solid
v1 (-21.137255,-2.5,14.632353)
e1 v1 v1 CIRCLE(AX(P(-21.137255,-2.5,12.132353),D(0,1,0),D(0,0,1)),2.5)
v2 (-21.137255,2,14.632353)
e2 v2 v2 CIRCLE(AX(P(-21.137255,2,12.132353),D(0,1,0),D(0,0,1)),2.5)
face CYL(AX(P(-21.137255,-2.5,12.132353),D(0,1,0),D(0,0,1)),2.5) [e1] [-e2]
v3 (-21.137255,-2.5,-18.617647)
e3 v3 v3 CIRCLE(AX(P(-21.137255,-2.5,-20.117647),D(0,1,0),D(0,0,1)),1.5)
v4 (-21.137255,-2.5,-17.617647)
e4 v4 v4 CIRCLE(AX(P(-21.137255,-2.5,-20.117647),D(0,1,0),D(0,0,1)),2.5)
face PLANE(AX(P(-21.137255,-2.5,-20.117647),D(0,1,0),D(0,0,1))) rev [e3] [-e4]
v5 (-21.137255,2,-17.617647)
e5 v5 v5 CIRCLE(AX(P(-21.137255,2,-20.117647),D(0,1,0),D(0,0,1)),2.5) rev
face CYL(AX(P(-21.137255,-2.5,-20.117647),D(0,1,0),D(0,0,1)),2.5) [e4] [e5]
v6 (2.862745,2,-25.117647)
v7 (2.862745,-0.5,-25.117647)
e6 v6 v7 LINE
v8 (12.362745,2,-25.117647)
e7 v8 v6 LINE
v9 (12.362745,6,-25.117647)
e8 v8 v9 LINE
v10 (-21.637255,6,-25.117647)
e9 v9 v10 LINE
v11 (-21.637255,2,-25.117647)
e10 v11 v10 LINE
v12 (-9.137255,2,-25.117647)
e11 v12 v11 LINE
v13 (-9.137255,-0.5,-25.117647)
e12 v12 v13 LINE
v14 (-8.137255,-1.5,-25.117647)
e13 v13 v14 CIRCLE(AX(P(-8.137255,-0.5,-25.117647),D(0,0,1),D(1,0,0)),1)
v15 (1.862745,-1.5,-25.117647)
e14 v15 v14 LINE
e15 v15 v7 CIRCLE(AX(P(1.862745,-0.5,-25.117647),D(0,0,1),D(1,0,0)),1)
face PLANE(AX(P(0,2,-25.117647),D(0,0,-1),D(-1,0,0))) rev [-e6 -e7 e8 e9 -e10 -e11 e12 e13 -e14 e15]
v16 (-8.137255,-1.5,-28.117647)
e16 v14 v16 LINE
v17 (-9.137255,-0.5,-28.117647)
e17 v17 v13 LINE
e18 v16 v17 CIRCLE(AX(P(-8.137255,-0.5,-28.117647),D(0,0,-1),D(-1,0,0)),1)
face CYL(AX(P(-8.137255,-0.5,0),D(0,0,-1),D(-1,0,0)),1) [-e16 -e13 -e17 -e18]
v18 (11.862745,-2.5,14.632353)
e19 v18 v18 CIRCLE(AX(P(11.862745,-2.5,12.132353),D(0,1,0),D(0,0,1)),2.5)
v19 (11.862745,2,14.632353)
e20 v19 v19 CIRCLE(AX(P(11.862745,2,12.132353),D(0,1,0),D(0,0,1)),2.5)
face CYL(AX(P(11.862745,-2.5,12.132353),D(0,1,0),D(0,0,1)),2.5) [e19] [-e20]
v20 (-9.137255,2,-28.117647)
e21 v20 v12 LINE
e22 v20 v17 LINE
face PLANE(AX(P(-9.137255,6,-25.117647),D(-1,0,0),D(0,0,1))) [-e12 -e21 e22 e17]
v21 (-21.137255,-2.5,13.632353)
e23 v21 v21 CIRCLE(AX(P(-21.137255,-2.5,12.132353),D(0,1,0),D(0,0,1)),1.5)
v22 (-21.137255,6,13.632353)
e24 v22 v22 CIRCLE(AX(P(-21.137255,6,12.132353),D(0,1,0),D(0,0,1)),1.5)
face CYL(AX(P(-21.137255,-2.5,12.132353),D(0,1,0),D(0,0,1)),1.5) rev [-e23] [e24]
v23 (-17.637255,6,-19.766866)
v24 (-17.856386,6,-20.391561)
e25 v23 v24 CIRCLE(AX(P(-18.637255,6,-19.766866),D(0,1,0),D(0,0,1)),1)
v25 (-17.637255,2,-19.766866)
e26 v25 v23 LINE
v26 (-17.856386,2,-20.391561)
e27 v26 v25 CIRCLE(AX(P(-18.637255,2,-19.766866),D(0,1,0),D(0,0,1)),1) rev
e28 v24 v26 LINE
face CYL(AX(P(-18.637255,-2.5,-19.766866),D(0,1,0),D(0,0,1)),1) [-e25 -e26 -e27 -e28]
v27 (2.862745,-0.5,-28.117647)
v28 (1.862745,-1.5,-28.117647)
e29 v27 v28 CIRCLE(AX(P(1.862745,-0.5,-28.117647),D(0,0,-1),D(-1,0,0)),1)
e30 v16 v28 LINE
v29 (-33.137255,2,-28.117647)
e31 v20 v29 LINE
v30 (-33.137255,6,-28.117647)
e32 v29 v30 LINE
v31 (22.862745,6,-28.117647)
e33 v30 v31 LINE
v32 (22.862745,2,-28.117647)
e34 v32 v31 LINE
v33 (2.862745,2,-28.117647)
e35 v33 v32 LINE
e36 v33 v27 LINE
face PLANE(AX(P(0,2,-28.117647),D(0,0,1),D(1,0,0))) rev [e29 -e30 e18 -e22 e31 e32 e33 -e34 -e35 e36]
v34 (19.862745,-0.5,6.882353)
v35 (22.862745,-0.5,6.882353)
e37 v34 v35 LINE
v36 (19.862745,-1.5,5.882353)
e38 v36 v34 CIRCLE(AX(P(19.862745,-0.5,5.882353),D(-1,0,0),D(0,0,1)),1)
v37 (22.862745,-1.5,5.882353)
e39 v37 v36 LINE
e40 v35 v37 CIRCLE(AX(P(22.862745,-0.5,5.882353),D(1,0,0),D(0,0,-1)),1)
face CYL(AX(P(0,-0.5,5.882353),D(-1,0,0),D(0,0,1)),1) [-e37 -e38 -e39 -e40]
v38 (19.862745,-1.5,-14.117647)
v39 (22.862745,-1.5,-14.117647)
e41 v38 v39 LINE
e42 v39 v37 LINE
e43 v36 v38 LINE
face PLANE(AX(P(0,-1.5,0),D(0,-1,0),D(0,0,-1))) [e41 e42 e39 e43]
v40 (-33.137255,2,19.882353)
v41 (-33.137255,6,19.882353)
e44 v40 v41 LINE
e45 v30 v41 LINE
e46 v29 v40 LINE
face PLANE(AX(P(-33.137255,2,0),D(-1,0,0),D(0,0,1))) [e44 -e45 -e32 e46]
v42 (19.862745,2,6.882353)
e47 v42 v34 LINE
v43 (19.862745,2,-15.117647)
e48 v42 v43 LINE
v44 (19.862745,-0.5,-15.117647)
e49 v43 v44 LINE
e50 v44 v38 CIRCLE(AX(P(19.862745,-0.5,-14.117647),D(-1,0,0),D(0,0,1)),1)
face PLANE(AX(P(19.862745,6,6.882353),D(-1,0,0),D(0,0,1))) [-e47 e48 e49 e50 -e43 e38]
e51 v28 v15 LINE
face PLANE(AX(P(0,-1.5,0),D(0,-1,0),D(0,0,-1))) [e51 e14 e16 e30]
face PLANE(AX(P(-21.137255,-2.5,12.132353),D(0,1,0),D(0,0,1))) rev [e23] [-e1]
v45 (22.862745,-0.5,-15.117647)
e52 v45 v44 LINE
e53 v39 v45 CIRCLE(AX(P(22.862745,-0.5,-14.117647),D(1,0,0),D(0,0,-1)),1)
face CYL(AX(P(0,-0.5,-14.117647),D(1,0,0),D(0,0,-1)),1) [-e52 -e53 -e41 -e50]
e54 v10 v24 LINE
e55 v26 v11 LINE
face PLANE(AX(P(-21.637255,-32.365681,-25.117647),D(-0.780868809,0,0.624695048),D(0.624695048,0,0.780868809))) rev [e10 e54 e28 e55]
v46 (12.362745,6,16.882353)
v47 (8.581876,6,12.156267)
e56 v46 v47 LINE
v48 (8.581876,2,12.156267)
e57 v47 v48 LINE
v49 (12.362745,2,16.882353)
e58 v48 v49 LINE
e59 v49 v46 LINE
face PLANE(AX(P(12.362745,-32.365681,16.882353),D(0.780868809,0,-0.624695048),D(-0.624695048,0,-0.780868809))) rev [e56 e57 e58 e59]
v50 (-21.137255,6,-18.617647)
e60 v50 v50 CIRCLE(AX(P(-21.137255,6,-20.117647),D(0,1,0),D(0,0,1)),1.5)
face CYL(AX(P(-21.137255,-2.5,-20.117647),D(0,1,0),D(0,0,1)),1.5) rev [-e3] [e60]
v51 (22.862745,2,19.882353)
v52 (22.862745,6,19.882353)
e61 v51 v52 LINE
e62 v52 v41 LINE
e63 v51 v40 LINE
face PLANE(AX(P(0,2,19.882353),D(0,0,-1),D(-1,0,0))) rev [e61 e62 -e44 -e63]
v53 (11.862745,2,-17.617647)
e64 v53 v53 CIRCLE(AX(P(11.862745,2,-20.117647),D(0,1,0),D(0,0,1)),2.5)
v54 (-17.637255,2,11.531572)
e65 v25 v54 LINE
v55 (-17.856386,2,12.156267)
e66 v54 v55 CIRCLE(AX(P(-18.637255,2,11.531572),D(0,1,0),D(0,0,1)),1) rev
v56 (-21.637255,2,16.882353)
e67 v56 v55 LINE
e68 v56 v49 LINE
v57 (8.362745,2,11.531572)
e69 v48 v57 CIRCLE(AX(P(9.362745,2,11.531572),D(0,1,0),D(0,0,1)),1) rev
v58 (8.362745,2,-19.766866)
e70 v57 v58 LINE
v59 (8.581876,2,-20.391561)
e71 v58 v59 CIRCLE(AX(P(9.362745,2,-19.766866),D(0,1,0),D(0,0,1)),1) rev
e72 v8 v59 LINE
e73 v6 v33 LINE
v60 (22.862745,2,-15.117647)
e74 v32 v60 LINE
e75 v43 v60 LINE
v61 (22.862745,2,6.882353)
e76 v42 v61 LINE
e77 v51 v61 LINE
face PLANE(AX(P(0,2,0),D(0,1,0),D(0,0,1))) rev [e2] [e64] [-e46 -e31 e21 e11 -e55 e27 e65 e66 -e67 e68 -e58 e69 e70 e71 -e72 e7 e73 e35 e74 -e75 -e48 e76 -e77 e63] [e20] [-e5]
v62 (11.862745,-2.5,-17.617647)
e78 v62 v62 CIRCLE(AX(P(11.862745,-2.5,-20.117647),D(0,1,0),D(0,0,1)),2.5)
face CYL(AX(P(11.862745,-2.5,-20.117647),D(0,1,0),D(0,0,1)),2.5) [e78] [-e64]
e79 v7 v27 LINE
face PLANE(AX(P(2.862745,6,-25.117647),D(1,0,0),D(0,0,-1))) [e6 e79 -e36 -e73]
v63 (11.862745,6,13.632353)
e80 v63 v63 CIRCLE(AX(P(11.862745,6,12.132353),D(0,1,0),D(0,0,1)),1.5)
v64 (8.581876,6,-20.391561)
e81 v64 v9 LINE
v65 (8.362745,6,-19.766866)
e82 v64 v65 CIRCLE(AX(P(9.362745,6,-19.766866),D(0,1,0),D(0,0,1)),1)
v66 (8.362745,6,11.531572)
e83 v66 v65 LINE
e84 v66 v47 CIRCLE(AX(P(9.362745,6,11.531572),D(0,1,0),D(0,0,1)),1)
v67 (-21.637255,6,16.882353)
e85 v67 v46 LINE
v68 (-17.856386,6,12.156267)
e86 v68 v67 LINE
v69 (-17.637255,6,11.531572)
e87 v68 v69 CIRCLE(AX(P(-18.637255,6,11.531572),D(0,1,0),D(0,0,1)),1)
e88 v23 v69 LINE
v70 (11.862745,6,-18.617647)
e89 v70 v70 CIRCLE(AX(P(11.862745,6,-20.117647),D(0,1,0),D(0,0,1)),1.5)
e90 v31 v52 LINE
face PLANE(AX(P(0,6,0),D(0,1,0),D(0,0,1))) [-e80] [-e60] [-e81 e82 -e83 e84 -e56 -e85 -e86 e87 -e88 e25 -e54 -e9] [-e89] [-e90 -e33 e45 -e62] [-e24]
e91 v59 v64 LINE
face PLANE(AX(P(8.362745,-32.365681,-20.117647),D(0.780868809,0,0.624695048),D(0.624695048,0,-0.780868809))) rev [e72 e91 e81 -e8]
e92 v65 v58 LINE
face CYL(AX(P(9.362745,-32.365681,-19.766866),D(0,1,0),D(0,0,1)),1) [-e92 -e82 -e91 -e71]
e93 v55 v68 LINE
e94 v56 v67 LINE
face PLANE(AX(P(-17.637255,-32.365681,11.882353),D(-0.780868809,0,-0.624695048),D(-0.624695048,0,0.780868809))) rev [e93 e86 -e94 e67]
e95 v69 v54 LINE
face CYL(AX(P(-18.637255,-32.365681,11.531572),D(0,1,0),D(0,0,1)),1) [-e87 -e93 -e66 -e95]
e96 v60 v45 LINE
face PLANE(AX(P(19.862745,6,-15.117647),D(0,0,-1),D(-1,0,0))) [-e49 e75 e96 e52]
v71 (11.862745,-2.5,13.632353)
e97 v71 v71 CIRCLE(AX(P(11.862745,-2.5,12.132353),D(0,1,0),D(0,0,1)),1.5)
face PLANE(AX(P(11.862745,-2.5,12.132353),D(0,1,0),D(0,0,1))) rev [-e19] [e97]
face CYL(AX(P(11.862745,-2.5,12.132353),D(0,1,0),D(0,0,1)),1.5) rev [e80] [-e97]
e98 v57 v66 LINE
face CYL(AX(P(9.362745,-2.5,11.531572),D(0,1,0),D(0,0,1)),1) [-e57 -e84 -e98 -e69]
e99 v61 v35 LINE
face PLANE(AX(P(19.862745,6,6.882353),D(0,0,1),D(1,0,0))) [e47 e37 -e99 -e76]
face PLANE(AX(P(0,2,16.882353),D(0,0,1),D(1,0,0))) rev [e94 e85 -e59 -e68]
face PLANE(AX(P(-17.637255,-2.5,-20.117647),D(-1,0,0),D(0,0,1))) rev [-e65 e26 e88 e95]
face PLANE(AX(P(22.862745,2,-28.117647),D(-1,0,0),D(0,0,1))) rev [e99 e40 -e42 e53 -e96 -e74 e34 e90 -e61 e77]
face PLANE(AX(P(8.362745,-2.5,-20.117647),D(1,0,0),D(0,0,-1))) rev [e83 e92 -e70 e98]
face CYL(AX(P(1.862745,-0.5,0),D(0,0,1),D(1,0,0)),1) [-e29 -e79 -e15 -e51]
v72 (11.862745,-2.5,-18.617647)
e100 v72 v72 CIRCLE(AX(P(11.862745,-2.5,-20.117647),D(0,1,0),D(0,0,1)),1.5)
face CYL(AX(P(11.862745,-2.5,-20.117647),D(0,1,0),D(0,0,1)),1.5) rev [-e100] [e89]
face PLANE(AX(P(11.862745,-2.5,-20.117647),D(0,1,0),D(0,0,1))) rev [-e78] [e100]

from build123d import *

# Parameters (mm, degrees)
BOSS_EXTRUDE1_DEPTH        = 6
BOSS_EXTRUDE1_DEPTH_BACK   = 2.5
SKETCH1_R                  = 2.5
SKETCH1_R_2                = 1.5
BOSS_EXTRUDE1_2_DEPTH      = 6
BOSS_EXTRUDE1_2_DEPTH_BACK = 2.5
BOSS_EXTRUDE1_3_DEPTH      = 6
BOSS_EXTRUDE1_3_DEPTH_BACK = 2.5
BOSS_EXTRUDE1_4_DEPTH      = 6
BOSS_EXTRUDE1_4_DEPTH_BACK = 2.5
SKETCH2_W                  = 50
SKETCH2_H                  = 42
BOSS_EXTRUDE3_DEPTH        = 4
CUT_EXTRUDE2_DEPTH         = 41.142251143
CUT_EXTRUDE2_DEPTH_BACK    = 41.142251143
SKETCH4_W                  = 26
SKETCH4_H                  = 32
BOSS_EXTRUDE4_DEPTH        = 3.5
BOSS_EXTRUDE4_DEPTH_BACK   = 4
SKETCH5_W                  = 3
SKETCH5_H                  = 22
BOSS_EXTRUDE5_DEPTH        = 3.5
BOSS_EXTRUDE5_DEPTH_BACK   = 4
SKETCH6_W                  = 12
SKETCH6_H                  = 3
SKETCH3_R                  = 1.5
CUT_EXTRUDE3_DEPTH         = 6
BOSS_EXTRUDE6_START        = -4
BOSS_EXTRUDE6_DEPTH        = 4
CUT_EXTRUDE6_DEPTH         = 4
FILLET1_R                  = 1
FILLET2_R                  = 1
FILLET3_R                  = 1
FILLET4_R                  = 1


# Read off the part's stored shape, not the designer's step: Boss-Extrude6
with BuildPart() as part:
    # Sketch1 → Boss-Extrude1 (new, two sides: drawn at the far end of the back side and taken through both)
    with BuildSketch(Plane(origin=(0, 0, 0), x_dir=(1, 0, 0), z_dir=(0, 1, 0)).offset(-BOSS_EXTRUDE1_DEPTH_BACK)):
        with Locations(Location((-21.137254902, 20.117647059, 0), (0, 0, 270))):
            Circle(SKETCH1_R)
        with Locations(Location((-21.137254902, 20.117647059, 0), (0, 0, 270))):
            Circle(SKETCH1_R_2, mode=Mode.SUBTRACT)
    extrude(amount=BOSS_EXTRUDE1_DEPTH + BOSS_EXTRUDE1_DEPTH_BACK)



with BuildPart() as body_2:
    # Sketch1 → Boss-Extrude1 2 (new, two sides: drawn at the far end of the back side and taken through both)
    with BuildSketch(Plane(origin=(0, 0, 0), x_dir=(1, 0, 0), z_dir=(0, 1, 0)).offset(-BOSS_EXTRUDE1_2_DEPTH_BACK)):
        with Locations(Location((11.862745098, 20.117647059, 0), (0, 0, 270))):
            Circle(SKETCH1_R)
        with Locations(Location((11.862745098, 20.117647059, 0), (0, 0, 270))):
            Circle(SKETCH1_R_2, mode=Mode.SUBTRACT)
    extrude(amount=BOSS_EXTRUDE1_2_DEPTH + BOSS_EXTRUDE1_2_DEPTH_BACK)


with BuildPart() as body_3:
    # Sketch1 → Boss-Extrude1 3 (new, two sides: drawn at the far end of the back side and taken through both)
    with BuildSketch(Plane(origin=(0, 0, 0), x_dir=(1, 0, 0), z_dir=(0, 1, 0)).offset(-BOSS_EXTRUDE1_3_DEPTH_BACK)):
        with Locations(Location((-21.137254902, -12.132352941, 0), (0, 0, 270))):
            Circle(SKETCH1_R)
        with Locations(Location((-21.137254902, -12.132352941, 0), (0, 0, 270))):
            Circle(SKETCH1_R_2, mode=Mode.SUBTRACT)
    extrude(amount=BOSS_EXTRUDE1_3_DEPTH + BOSS_EXTRUDE1_3_DEPTH_BACK)


with BuildPart() as body_4:
    # Sketch1 → Boss-Extrude1 4 (new, two sides: drawn at the far end of the back side and taken through both)
    with BuildSketch(Plane(origin=(0, 0, 0), x_dir=(1, 0, 0), z_dir=(0, 1, 0)).offset(-BOSS_EXTRUDE1_4_DEPTH_BACK)):
        with Locations(Location((11.862745098, -12.132352941, 0), (0, 0, 270))):
            Circle(SKETCH1_R)
        with Locations(Location((11.862745098, -12.132352941, 0), (0, 0, 270))):
            Circle(SKETCH1_R_2, mode=Mode.SUBTRACT)
    extrude(amount=BOSS_EXTRUDE1_4_DEPTH + BOSS_EXTRUDE1_4_DEPTH_BACK)


with BuildPart() as part_1:
    add(part.part)

    add(body_2.part)  # Boss-Extrude3 merges body 2

    add(body_3.part)  # Boss-Extrude3 merges body 3

    add(body_4.part)  # Boss-Extrude3 merges body 4
    # Sketch2 → Boss-Extrude3 (add)
    with BuildSketch(Plane(origin=(0, 6, 0), x_dir=(1, 0, 0), z_dir=(0, 1, 0))):
        with Locations((-5.137254902, 4.117647059)):
            Rectangle(SKETCH2_W, SKETCH2_H)
    extrude(amount=-BOSS_EXTRUDE3_DEPTH)

    # Sketch4 → Cut-Extrude2 (cut, two sides: drawn at the far end of the back side and taken through both)
    with BuildSketch(Plane(origin=(0, 6, 0), x_dir=(1, 0, 0), z_dir=(0, 1, 0)).offset(-CUT_EXTRUDE2_DEPTH_BACK)):
        with Locations((-4.637254902, 4.117647059)):
            Rectangle(SKETCH4_W, SKETCH4_H)
    extrude(amount=CUT_EXTRUDE2_DEPTH + CUT_EXTRUDE2_DEPTH_BACK, mode=Mode.SUBTRACT)

    # Sketch5 → Boss-Extrude4 (add, two sides: drawn at the far end of the back side and taken through both)
    with BuildSketch(Plane.XZ.offset(-2).offset(-BOSS_EXTRUDE4_DEPTH_BACK)):
        with Locations((21.362745098, -4.117647059)):
            Rectangle(SKETCH5_W, SKETCH5_H)
    extrude(amount=BOSS_EXTRUDE4_DEPTH + BOSS_EXTRUDE4_DEPTH_BACK)

    # Sketch6 → Boss-Extrude5 (add, two sides: drawn at the far end of the back side and taken through both)
    with BuildSketch(Plane.XZ.offset(-2).offset(-BOSS_EXTRUDE5_DEPTH_BACK)):
        with Locations((-3.137254902, -26.617647059)):
            Rectangle(SKETCH6_W, SKETCH6_H)
    extrude(amount=BOSS_EXTRUDE5_DEPTH + BOSS_EXTRUDE5_DEPTH_BACK)

    # Sketch3 → Cut-Extrude3 (cut)
    with BuildSketch(Plane(origin=(0, 6, 0), x_dir=(1, 0, 0), z_dir=(0, 1, 0))):
        with Locations(Location((-21.137254902, 20.117647059, 0), (0, 0, 270))):
            Circle(SKETCH3_R)
        with Locations(Location((-21.137254902, -12.132352941, 0), (0, 0, 270))):
            Circle(SKETCH3_R)
        with Locations(Location((11.862745098, -12.132352941, 0), (0, 0, 270))):
            Circle(SKETCH3_R)
        with Locations(Location((11.862745098, 20.117647059, 0), (0, 0, 270))):
            Circle(SKETCH3_R)
    extrude(amount=-CUT_EXTRUDE3_DEPTH, mode=Mode.SUBTRACT)

    # Sketch10 → Cut-Extrude6 (cut)
    with BuildSketch(Plane(origin=(0, 6, 0), x_dir=(1, 0, 0), z_dir=(0, 1, 0))):
        Polygon((8.362745098, 20.117647059), (12.362745098, 25.117647059), (-21.637254902, 25.117647059), (-17.637254902, 20.117647059), align=None)
        Polygon((-17.637254902, -11.882352941), (-21.637254902, -16.882352941), (12.362745098, -16.882352941), (8.362745098, -11.882352941), align=None)
    extrude(amount=-CUT_EXTRUDE6_DEPTH, mode=Mode.SUBTRACT)


with BuildPart() as body_2_2:
    # Boss-Extrude6 outline → Boss-Extrude6 (new body)
    with BuildSketch(Plane(origin=(0, 6, 0), x_dir=(1, 0, 0), z_dir=(0, 1, 0)).offset(BOSS_EXTRUDE6_START)):
        Polygon((-9.137254902, 25.117647059), (-9.137254902, 28.117647059), (-33.137254902, 28.117647059), (-33.137254902, -19.882352941), (22.862745098, -19.882352941), (22.862745098, -6.882352941), (19.862745098, -6.882352941), (19.862745098, -16.882352941), (-30.137254902, -16.882352941), (-30.137254902, 25.117647059), align=None)
        Polygon((22.862745098, 28.117647059), (2.862745098, 28.117647059), (2.862745098, 25.117647059), (19.862745098, 25.117647059), (19.862745098, 15.117647059), (22.862745098, 15.117647059), align=None)
    extrude(amount=BOSS_EXTRUDE6_DEPTH)


with BuildPart() as cut_extrude6_piece_1:
    # of the separate pieces the step leaves, piece 1, a body of its own (cut_extrude6_pieces)
    add(part_1.part.solids().sort_by_distance((8.362745098, 2, -20.117647059))[0])

    # Fillet2
    fillet2_edges = [cut_extrude6_piece_1.edges().sort_by_distance(p)[0] for p in [
        (8.362745098, 4, 11.882352941),
        (8.362745098, 4, -20.117647059),
    ]]
    fillet(fillet2_edges, radius=FILLET2_R)

    # Fillet4
    fillet4_edges = [cut_extrude6_piece_1.edges().sort_by_distance(p)[0] for p in [
        (21.362745098, -1.5, -15.117647059),
        (21.362745098, -1.5, 6.882352941),
    ]]
    fillet(fillet4_edges, radius=FILLET4_R)


with BuildPart() as cut_extrude6_piece_2:
    # of the separate pieces the step leaves, piece 2, a body of its own (cut_extrude6_pieces)
    add(part_1.part.solids().sort_by_distance((-21.137254902, 0, -17.617647059))[0])

    # Fillet1
    fillet1_edges = [cut_extrude6_piece_2.edges().sort_by_distance(p)[0] for p in [
        (-17.637254902, 4, 11.882352941),
        (-17.637254902, 4, -20.117647059),
    ]]
    fillet(fillet1_edges, radius=FILLET1_R)


with BuildPart() as cut_extrude6_piece_3:
    # of the separate pieces the step leaves, piece 3, a body of its own (cut_extrude6_pieces)
    add(part_1.part.solids().sort_by_distance((-9.137254902, -1.5, -25.117647059))[0])

    # Fillet3
    fillet3_edges = [cut_extrude6_piece_3.edges().sort_by_distance(p)[0] for p in [
        (-9.137254902, -1.5, -26.617647059),
        (2.862745098, -1.5, -26.617647059),
    ]]
    fillet(fillet3_edges, radius=FILLET3_R)


with BuildPart() as body_2_2_1:
    add(body_2_2.part)

    # Combine1: union Cut-Extrude6 piece 2, Cut-Extrude6 piece 3, Cut-Extrude6 piece 1
    add(cut_extrude6_piece_2.part)
    add(cut_extrude6_piece_3.part)
    add(cut_extrude6_piece_1.part)


solid = body_2_2_1.part
